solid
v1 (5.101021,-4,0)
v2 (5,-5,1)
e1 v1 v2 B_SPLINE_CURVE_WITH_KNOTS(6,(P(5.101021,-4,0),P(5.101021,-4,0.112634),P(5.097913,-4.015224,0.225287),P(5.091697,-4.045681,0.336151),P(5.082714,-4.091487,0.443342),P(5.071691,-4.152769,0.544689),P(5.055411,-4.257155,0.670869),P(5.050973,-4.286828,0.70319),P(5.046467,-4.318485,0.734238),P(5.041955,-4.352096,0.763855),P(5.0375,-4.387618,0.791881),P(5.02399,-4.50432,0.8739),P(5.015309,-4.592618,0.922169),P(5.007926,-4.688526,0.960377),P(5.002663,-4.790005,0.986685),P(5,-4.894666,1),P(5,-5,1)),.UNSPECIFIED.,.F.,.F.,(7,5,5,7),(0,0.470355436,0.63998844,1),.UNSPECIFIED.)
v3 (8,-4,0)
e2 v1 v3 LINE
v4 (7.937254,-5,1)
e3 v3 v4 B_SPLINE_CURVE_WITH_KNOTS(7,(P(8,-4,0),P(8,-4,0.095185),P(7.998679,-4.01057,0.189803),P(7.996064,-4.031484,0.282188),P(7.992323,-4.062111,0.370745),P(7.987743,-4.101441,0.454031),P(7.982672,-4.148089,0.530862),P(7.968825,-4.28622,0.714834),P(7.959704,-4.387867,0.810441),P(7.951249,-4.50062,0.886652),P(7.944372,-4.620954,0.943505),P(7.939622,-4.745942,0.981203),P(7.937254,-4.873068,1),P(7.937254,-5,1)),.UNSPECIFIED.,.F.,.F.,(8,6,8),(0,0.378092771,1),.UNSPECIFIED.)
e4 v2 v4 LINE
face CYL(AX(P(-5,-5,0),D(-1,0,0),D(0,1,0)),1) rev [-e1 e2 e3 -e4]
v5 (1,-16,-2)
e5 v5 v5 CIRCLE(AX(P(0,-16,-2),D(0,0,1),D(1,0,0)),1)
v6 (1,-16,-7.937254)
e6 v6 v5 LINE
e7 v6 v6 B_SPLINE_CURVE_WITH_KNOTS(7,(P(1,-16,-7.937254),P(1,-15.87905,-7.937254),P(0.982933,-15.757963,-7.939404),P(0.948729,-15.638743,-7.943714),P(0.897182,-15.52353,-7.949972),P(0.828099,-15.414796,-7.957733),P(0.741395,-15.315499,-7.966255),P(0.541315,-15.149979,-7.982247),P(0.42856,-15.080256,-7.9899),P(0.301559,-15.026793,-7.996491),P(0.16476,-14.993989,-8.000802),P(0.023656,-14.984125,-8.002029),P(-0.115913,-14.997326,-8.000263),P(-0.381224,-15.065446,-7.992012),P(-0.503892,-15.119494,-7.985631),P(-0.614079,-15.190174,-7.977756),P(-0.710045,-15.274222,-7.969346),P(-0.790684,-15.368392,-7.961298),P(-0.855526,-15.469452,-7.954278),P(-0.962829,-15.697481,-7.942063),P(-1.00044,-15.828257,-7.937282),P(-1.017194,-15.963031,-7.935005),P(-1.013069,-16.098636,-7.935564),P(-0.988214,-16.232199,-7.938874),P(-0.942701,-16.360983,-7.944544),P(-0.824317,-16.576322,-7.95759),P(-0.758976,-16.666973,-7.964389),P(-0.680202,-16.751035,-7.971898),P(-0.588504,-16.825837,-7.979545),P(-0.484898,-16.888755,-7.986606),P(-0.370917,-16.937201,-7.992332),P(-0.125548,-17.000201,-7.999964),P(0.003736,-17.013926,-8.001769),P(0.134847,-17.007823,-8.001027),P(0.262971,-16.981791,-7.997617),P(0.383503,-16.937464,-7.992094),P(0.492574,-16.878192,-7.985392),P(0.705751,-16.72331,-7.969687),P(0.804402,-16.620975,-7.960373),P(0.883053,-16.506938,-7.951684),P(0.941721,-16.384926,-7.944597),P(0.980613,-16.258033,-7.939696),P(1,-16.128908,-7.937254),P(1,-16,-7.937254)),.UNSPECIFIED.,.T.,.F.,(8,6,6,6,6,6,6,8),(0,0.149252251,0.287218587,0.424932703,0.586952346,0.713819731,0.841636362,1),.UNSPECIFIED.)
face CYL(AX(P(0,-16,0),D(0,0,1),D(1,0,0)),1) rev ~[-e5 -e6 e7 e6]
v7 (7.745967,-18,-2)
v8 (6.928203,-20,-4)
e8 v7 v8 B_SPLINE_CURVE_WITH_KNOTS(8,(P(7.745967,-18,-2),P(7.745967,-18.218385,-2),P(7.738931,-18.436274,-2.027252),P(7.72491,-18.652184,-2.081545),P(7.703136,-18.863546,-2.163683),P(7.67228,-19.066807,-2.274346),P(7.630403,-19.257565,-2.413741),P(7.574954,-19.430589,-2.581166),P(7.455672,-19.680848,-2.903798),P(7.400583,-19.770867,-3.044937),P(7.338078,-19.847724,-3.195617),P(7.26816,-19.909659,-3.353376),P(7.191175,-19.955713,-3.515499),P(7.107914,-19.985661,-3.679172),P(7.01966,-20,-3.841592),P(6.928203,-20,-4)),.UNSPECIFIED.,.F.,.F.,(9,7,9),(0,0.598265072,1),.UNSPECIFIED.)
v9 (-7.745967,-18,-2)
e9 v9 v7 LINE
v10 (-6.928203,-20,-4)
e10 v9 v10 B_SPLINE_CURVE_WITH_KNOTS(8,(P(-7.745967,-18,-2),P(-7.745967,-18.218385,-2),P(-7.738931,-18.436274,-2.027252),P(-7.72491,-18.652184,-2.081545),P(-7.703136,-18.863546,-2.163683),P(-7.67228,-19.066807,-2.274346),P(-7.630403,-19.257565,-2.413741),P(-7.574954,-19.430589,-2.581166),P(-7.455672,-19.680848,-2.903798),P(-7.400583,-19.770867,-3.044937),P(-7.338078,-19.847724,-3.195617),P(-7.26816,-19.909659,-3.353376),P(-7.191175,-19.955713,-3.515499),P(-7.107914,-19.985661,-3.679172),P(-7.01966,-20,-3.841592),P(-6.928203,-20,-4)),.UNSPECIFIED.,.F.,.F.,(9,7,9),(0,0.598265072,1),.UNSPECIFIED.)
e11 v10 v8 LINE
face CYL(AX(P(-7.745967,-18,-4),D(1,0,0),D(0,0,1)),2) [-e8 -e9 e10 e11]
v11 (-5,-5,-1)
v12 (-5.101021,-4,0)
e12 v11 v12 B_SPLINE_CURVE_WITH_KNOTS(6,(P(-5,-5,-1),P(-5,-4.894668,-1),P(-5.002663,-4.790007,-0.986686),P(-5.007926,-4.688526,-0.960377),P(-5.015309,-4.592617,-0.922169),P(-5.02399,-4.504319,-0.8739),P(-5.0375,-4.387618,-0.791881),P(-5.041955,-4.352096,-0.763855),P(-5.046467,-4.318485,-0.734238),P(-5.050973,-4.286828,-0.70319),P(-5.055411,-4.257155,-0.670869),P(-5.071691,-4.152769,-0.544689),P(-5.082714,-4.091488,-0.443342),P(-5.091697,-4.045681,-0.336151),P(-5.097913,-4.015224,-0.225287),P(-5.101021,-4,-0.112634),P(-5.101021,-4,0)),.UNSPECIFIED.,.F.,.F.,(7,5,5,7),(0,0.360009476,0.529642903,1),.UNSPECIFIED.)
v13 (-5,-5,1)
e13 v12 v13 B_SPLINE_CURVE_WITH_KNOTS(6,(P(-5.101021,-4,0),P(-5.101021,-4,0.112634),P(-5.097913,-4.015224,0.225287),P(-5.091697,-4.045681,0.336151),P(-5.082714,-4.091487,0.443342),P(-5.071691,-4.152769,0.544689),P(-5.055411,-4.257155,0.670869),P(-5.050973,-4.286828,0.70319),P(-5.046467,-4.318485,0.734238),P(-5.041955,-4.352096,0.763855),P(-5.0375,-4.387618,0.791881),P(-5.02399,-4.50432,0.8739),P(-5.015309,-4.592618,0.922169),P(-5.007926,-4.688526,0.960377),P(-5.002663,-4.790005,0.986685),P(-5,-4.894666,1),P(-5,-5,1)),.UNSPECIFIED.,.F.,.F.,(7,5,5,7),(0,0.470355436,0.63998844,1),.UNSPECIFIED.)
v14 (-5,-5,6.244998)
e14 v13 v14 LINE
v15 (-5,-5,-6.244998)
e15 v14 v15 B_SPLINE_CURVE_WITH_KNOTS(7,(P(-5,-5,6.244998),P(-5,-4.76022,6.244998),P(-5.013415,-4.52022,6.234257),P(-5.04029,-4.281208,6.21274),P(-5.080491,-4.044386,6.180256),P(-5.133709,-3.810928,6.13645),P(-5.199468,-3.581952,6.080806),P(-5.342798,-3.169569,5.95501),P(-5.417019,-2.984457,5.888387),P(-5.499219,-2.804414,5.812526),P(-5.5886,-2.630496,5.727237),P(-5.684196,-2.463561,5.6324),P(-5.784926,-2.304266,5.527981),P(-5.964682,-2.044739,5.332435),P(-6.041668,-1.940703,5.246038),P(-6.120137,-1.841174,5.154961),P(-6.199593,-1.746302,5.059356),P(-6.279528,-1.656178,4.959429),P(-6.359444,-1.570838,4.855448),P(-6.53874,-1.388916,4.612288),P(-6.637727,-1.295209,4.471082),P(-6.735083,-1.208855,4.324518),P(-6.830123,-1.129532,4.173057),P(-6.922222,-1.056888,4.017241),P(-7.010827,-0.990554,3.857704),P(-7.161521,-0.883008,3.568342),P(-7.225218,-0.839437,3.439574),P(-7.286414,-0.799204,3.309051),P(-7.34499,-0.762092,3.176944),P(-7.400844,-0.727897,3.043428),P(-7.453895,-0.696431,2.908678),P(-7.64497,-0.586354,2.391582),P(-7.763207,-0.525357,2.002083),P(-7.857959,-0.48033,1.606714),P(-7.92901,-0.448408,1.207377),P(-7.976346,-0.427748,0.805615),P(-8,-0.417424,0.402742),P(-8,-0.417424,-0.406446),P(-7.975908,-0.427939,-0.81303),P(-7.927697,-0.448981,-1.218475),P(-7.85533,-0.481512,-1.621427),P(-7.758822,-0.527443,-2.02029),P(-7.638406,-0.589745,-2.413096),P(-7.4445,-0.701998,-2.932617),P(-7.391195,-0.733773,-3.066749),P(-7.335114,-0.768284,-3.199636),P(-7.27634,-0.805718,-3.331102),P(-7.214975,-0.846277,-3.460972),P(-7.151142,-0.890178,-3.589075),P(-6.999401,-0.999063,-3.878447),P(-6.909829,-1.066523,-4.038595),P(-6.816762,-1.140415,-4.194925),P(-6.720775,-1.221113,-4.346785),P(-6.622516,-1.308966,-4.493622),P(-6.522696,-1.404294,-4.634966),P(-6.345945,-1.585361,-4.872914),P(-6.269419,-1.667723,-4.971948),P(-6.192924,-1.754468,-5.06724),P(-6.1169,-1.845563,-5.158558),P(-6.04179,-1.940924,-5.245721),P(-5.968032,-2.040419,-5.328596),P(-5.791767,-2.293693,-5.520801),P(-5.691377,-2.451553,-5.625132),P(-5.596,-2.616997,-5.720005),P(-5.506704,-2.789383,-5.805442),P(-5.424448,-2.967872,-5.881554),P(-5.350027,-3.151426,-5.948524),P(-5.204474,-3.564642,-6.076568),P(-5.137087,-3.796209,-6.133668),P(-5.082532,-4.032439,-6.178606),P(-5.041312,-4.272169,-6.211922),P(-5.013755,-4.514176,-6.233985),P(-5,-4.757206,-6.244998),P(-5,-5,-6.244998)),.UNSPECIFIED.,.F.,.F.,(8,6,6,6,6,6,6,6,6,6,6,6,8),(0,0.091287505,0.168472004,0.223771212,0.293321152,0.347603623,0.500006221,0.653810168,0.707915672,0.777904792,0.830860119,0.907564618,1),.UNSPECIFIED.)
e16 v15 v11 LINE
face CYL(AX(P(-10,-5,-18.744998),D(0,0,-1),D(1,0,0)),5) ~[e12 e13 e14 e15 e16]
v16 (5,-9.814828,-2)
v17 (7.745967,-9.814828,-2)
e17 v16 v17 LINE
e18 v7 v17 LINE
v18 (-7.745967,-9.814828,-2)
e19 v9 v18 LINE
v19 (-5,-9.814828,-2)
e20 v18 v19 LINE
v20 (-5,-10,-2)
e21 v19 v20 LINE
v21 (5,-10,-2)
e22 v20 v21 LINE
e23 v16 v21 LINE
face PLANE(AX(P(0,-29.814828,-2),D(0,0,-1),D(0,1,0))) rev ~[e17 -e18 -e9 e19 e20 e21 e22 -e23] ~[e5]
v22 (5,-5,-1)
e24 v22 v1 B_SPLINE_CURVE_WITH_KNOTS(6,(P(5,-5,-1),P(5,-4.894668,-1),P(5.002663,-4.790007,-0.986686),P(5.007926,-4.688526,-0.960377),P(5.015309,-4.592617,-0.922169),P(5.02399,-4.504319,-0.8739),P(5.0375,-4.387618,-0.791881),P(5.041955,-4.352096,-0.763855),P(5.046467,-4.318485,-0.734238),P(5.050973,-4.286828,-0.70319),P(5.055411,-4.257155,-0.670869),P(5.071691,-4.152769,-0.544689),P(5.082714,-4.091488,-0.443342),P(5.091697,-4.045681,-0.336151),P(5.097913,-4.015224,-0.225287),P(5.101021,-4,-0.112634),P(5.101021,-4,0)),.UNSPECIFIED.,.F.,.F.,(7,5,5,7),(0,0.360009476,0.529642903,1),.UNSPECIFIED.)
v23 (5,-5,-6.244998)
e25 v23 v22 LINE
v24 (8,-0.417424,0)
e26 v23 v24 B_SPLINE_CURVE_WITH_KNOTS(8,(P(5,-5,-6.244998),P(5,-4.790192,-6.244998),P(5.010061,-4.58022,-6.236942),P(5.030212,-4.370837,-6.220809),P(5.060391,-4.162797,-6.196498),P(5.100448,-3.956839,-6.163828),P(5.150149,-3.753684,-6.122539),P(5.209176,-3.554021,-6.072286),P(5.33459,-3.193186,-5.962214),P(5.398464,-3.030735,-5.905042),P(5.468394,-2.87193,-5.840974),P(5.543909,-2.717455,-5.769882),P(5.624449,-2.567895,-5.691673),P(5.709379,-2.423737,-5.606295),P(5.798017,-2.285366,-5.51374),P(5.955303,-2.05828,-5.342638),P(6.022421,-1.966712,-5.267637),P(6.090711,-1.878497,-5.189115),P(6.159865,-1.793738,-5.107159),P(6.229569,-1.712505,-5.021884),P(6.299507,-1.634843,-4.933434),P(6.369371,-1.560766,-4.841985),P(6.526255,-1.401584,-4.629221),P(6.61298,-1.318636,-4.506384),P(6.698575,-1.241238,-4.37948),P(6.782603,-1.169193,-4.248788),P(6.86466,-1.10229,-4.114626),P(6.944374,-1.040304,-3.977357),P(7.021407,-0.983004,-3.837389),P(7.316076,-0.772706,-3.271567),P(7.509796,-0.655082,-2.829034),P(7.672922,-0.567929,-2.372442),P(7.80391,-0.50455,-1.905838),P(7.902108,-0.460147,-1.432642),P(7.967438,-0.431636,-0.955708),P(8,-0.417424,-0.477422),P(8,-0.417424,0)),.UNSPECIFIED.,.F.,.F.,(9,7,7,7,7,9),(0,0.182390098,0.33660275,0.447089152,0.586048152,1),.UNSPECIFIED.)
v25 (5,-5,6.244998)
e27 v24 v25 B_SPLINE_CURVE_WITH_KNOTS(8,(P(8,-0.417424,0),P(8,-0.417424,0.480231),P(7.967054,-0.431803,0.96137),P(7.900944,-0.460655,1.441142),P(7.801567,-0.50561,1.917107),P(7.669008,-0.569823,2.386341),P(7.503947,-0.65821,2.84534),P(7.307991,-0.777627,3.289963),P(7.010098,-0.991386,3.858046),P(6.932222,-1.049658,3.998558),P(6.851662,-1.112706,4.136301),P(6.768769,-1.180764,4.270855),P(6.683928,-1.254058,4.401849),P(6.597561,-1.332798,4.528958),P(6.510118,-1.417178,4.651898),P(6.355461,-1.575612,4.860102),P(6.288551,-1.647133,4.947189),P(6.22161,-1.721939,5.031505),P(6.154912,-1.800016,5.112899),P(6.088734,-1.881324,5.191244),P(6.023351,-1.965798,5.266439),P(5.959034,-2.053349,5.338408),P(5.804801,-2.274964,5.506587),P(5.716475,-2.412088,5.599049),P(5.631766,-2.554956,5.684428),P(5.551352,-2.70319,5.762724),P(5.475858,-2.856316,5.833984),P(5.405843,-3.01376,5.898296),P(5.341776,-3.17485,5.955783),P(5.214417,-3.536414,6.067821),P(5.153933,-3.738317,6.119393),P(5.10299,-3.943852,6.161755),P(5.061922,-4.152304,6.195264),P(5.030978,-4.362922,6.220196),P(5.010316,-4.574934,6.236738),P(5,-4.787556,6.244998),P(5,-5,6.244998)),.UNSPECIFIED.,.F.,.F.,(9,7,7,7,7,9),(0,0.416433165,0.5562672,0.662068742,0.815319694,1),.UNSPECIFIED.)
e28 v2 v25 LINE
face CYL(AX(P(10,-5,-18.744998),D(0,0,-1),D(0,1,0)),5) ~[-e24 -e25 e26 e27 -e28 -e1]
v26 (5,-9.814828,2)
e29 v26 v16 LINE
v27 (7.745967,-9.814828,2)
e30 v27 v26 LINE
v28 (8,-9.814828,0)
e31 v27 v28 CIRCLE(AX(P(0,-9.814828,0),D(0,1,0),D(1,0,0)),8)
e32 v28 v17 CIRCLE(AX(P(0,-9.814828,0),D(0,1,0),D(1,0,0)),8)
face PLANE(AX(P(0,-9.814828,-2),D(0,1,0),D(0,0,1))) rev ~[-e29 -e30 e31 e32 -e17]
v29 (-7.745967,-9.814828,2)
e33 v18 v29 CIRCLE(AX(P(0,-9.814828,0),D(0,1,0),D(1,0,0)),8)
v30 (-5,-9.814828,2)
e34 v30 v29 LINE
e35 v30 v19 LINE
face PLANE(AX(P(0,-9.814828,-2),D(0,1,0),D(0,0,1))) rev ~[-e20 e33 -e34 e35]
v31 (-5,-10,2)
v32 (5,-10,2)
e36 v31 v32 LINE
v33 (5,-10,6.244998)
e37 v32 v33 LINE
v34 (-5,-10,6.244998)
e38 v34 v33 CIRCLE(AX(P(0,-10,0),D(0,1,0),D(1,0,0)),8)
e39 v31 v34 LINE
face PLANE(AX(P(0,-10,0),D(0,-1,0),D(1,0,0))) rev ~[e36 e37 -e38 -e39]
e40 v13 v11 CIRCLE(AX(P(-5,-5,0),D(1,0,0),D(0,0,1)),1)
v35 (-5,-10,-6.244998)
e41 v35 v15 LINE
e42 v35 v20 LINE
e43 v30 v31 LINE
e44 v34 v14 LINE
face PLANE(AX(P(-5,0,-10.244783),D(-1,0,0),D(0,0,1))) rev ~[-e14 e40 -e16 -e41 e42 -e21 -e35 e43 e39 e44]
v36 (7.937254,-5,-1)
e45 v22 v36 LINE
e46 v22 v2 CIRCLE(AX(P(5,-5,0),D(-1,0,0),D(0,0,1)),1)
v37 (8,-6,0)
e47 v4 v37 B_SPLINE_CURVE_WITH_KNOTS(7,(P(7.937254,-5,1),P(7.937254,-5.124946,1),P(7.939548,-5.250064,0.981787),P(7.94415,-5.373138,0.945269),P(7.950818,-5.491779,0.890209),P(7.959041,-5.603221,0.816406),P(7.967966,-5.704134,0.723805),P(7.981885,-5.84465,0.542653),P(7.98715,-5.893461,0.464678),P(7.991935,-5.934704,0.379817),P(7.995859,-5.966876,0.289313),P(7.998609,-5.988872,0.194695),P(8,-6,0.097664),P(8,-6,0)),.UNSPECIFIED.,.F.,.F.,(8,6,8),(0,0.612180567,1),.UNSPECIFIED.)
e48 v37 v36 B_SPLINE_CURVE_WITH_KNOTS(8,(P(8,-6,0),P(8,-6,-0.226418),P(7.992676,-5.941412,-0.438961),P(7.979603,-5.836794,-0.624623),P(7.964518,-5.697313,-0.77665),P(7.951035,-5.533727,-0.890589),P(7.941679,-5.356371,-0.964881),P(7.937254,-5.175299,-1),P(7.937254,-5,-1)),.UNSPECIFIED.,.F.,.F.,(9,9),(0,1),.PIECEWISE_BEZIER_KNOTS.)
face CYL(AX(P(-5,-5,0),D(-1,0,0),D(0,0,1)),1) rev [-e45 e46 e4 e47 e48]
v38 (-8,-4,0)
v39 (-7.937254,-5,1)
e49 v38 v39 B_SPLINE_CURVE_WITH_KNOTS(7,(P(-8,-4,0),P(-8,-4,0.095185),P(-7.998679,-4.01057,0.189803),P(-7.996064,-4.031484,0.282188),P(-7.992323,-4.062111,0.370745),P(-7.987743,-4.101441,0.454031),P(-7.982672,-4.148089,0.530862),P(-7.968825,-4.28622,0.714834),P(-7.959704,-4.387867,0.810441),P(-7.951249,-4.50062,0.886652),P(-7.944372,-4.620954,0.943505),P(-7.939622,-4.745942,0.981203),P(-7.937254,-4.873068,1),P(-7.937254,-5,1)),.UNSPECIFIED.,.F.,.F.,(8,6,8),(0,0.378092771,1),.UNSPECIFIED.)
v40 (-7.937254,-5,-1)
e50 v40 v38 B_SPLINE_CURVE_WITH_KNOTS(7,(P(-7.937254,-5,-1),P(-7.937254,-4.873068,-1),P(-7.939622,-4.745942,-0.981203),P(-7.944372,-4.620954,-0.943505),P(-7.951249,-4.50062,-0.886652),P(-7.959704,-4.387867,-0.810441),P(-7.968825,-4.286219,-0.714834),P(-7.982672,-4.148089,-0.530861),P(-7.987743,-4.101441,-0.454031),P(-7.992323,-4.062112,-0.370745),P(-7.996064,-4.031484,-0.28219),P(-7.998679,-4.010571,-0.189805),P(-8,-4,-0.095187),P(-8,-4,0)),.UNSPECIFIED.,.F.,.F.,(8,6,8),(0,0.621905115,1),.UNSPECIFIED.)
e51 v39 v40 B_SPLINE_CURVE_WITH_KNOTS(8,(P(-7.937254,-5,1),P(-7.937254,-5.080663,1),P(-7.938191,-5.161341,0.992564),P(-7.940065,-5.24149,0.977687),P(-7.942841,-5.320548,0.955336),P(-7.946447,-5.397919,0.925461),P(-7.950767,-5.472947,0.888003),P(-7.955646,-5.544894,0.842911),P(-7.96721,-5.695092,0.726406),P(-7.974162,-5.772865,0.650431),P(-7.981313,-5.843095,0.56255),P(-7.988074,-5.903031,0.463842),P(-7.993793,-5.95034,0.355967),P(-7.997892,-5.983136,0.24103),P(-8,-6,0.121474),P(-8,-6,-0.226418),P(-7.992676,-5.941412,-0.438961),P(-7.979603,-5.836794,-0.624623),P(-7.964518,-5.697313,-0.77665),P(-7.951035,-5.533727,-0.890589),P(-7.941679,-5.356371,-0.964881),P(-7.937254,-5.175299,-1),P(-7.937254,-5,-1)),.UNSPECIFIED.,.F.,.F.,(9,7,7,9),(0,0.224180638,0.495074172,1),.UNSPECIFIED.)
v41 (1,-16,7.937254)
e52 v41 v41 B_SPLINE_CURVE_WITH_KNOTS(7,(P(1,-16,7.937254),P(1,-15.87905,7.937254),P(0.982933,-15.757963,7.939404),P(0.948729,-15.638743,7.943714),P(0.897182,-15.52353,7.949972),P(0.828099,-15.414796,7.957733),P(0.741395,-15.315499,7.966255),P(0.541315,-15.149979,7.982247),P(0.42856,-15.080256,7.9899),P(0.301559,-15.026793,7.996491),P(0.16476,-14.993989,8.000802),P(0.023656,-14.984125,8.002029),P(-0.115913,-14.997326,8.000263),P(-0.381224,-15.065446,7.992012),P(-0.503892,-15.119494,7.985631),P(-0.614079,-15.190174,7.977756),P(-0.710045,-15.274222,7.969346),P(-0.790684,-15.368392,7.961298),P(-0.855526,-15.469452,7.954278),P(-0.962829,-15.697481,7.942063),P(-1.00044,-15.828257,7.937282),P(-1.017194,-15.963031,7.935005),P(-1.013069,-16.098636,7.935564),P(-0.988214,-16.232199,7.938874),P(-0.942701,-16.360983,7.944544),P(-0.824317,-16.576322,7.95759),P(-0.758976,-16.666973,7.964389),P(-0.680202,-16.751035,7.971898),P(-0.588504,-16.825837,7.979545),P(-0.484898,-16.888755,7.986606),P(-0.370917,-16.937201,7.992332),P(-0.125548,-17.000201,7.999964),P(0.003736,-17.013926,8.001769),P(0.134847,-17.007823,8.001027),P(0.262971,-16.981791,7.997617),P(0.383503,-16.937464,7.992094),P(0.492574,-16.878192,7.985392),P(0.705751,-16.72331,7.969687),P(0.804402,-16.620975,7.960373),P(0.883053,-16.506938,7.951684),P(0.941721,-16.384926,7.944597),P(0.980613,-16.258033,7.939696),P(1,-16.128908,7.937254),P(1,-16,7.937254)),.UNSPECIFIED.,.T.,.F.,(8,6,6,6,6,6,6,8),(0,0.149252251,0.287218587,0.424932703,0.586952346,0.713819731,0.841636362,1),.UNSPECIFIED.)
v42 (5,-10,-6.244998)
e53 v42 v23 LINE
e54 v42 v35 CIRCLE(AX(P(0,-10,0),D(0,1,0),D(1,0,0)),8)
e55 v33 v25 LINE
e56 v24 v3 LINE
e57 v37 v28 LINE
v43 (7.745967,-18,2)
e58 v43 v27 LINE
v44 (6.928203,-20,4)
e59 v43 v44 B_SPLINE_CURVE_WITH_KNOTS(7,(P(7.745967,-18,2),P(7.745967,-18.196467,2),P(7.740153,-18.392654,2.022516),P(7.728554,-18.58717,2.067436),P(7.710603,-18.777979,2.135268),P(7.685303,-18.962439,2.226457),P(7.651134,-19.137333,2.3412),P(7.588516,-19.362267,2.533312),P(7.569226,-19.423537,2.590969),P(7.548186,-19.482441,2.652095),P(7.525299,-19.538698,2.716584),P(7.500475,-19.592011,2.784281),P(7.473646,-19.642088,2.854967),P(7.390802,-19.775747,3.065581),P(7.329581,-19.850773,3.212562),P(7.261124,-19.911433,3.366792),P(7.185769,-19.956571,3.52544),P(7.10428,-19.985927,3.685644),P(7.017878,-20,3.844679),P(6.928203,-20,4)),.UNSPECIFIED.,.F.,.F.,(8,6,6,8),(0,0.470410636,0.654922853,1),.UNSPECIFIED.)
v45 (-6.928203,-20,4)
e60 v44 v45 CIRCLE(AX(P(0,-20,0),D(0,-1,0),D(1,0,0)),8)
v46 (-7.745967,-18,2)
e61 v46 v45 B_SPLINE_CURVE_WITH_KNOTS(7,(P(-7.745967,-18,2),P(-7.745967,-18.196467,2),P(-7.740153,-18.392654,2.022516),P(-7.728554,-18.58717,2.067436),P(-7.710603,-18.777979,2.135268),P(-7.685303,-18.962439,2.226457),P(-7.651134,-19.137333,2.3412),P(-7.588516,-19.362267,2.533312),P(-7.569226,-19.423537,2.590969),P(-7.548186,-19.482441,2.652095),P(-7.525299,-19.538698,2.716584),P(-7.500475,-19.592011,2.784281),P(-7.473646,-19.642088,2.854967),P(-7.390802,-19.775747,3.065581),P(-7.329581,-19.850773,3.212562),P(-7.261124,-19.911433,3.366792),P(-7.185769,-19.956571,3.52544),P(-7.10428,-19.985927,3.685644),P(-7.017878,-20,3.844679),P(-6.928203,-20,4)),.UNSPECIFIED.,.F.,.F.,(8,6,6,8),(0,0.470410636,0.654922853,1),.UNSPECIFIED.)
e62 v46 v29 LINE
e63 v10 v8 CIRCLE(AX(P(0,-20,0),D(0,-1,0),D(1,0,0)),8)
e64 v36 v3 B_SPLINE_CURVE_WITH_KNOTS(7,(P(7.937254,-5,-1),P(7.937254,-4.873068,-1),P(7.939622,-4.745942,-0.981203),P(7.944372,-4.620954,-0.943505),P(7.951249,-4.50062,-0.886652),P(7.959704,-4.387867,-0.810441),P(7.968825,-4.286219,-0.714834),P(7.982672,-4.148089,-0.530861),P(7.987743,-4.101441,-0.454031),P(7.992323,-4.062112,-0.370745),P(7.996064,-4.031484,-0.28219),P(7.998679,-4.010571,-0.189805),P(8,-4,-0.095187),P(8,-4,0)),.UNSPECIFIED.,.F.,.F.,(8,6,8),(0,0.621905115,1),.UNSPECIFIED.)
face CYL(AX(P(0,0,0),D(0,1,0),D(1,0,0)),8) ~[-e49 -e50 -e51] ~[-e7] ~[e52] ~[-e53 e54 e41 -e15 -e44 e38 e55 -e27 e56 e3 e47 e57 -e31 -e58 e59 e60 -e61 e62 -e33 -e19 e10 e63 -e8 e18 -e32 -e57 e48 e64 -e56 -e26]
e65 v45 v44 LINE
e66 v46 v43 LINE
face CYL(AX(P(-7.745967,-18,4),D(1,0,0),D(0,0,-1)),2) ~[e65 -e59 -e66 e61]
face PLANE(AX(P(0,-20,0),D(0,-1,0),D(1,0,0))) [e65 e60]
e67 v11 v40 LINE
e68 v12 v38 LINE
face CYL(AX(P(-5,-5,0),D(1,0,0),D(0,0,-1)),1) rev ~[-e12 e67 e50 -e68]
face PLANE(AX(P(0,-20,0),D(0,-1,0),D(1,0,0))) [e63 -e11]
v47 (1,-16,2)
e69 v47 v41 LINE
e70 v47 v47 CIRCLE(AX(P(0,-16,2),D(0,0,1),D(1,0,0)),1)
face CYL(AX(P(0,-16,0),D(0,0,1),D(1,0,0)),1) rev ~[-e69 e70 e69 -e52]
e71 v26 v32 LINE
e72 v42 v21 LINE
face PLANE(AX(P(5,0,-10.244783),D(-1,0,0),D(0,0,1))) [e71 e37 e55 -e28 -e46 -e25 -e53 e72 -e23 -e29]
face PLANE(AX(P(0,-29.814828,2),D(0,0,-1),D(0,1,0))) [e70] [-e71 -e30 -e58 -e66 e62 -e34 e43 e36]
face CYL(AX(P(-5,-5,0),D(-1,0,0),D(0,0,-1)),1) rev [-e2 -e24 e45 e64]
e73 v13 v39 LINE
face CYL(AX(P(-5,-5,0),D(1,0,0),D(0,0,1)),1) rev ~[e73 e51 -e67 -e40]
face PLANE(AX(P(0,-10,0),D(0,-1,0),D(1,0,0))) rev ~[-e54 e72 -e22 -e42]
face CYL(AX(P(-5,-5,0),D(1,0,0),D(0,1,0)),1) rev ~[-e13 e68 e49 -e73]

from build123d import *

# Parameters (mm, degrees)
F0_R        = 8
F1_DEPTH    = 20
F2_W        = 10
F2_H        = 20.4895668926
F3_DEPTH    = 10
F4_W        = 20
F4_H        = 4
F5_DEPTH    = 50
F6_T1_DEPTH = 37.4899959968
F7_R        = 2
F9_DEPTH    = 50
F10_R       = 1
F11_DEPTH   = 25


# Not quite as in the source:
# - a fillet or chamfer that OpenCascade refuses, or shapes differently, is made with other operations: its cross-section is extruded or revolved along the edge and cut away or added


with BuildPart() as f1:
    # F0 (on Front) → F1 (new body)
    with BuildSketch(Plane.XZ):
        Circle(F0_R)
    extrude(amount=F1_DEPTH)

    # F2 (on Front) → F3 (cut)
    with BuildSketch(Plane.XZ):
        Rectangle(F2_W, F2_H)
    extrude(amount=F3_DEPTH, mode=Mode.SUBTRACT)

    # F4 (on Right) → F5 (cut, symmetric)
    with BuildSketch(Plane.YZ):
        with Locations((-19.8148275974, 0)):
            Rectangle(F4_W, F4_H)
    extrude(amount=F5_DEPTH, both=True, mode=Mode.SUBTRACT)

    # F6: fillet of radius 5 on 2 edges, made by hand

    # F6_s2 → F6_t1 (cut)
    with BuildSketch(Plane.XY.offset(-18.7449979984)):
        with BuildLine():
            ThreePointArc((10, 0), (6.4644660941, -1.4644660941), (5, -5))
            Line((5, -5), (5, 0))
            Line((5, 0), (10, 0))
        make_face()
        with BuildLine():
            ThreePointArc((-5, -5), (-6.4644660941, -1.4644660941), (-10, 0))
            Line((-10, 0), (-5, 0))
            Line((-5, 0), (-5, -5))
        make_face()
    extrude(amount=F6_T1_DEPTH, mode=Mode.SUBTRACT)

    # F7
    f7_edges = [f1.edges().sort_by_distance(p)[0] for p in [
        (0, -20, -2),
        (0, -20, 2),
    ]]
    fillet(f7_edges, radius=F7_R)

    # F8 (on face) → F9 (cut, symmetric)
    with BuildSketch(Plane.YZ.offset(-5)):
        with BuildLine():
            Line((-5, -1), (-5, 1))
            ThreePointArc((-5, 1), (-6, 0), (-5, -1))
        make_face()
        with BuildLine():
            ThreePointArc((-5, -1), (-4.2928932188, -0.7071067812), (-4, 0))
            ThreePointArc((-4, 0), (-4.2928932188, 0.7071067812), (-5, 1))
            Line((-5, 1), (-5, -1))
        make_face()
    extrude(amount=F9_DEPTH, both=True, mode=Mode.SUBTRACT)

    # F10 (on Top) → F11 (cut, symmetric)
    with BuildSketch(Plane.XY):
        with Locations((0, -16)):
            Circle(F10_R)
    extrude(amount=F11_DEPTH, both=True, mode=Mode.SUBTRACT)


solid = f1.part
